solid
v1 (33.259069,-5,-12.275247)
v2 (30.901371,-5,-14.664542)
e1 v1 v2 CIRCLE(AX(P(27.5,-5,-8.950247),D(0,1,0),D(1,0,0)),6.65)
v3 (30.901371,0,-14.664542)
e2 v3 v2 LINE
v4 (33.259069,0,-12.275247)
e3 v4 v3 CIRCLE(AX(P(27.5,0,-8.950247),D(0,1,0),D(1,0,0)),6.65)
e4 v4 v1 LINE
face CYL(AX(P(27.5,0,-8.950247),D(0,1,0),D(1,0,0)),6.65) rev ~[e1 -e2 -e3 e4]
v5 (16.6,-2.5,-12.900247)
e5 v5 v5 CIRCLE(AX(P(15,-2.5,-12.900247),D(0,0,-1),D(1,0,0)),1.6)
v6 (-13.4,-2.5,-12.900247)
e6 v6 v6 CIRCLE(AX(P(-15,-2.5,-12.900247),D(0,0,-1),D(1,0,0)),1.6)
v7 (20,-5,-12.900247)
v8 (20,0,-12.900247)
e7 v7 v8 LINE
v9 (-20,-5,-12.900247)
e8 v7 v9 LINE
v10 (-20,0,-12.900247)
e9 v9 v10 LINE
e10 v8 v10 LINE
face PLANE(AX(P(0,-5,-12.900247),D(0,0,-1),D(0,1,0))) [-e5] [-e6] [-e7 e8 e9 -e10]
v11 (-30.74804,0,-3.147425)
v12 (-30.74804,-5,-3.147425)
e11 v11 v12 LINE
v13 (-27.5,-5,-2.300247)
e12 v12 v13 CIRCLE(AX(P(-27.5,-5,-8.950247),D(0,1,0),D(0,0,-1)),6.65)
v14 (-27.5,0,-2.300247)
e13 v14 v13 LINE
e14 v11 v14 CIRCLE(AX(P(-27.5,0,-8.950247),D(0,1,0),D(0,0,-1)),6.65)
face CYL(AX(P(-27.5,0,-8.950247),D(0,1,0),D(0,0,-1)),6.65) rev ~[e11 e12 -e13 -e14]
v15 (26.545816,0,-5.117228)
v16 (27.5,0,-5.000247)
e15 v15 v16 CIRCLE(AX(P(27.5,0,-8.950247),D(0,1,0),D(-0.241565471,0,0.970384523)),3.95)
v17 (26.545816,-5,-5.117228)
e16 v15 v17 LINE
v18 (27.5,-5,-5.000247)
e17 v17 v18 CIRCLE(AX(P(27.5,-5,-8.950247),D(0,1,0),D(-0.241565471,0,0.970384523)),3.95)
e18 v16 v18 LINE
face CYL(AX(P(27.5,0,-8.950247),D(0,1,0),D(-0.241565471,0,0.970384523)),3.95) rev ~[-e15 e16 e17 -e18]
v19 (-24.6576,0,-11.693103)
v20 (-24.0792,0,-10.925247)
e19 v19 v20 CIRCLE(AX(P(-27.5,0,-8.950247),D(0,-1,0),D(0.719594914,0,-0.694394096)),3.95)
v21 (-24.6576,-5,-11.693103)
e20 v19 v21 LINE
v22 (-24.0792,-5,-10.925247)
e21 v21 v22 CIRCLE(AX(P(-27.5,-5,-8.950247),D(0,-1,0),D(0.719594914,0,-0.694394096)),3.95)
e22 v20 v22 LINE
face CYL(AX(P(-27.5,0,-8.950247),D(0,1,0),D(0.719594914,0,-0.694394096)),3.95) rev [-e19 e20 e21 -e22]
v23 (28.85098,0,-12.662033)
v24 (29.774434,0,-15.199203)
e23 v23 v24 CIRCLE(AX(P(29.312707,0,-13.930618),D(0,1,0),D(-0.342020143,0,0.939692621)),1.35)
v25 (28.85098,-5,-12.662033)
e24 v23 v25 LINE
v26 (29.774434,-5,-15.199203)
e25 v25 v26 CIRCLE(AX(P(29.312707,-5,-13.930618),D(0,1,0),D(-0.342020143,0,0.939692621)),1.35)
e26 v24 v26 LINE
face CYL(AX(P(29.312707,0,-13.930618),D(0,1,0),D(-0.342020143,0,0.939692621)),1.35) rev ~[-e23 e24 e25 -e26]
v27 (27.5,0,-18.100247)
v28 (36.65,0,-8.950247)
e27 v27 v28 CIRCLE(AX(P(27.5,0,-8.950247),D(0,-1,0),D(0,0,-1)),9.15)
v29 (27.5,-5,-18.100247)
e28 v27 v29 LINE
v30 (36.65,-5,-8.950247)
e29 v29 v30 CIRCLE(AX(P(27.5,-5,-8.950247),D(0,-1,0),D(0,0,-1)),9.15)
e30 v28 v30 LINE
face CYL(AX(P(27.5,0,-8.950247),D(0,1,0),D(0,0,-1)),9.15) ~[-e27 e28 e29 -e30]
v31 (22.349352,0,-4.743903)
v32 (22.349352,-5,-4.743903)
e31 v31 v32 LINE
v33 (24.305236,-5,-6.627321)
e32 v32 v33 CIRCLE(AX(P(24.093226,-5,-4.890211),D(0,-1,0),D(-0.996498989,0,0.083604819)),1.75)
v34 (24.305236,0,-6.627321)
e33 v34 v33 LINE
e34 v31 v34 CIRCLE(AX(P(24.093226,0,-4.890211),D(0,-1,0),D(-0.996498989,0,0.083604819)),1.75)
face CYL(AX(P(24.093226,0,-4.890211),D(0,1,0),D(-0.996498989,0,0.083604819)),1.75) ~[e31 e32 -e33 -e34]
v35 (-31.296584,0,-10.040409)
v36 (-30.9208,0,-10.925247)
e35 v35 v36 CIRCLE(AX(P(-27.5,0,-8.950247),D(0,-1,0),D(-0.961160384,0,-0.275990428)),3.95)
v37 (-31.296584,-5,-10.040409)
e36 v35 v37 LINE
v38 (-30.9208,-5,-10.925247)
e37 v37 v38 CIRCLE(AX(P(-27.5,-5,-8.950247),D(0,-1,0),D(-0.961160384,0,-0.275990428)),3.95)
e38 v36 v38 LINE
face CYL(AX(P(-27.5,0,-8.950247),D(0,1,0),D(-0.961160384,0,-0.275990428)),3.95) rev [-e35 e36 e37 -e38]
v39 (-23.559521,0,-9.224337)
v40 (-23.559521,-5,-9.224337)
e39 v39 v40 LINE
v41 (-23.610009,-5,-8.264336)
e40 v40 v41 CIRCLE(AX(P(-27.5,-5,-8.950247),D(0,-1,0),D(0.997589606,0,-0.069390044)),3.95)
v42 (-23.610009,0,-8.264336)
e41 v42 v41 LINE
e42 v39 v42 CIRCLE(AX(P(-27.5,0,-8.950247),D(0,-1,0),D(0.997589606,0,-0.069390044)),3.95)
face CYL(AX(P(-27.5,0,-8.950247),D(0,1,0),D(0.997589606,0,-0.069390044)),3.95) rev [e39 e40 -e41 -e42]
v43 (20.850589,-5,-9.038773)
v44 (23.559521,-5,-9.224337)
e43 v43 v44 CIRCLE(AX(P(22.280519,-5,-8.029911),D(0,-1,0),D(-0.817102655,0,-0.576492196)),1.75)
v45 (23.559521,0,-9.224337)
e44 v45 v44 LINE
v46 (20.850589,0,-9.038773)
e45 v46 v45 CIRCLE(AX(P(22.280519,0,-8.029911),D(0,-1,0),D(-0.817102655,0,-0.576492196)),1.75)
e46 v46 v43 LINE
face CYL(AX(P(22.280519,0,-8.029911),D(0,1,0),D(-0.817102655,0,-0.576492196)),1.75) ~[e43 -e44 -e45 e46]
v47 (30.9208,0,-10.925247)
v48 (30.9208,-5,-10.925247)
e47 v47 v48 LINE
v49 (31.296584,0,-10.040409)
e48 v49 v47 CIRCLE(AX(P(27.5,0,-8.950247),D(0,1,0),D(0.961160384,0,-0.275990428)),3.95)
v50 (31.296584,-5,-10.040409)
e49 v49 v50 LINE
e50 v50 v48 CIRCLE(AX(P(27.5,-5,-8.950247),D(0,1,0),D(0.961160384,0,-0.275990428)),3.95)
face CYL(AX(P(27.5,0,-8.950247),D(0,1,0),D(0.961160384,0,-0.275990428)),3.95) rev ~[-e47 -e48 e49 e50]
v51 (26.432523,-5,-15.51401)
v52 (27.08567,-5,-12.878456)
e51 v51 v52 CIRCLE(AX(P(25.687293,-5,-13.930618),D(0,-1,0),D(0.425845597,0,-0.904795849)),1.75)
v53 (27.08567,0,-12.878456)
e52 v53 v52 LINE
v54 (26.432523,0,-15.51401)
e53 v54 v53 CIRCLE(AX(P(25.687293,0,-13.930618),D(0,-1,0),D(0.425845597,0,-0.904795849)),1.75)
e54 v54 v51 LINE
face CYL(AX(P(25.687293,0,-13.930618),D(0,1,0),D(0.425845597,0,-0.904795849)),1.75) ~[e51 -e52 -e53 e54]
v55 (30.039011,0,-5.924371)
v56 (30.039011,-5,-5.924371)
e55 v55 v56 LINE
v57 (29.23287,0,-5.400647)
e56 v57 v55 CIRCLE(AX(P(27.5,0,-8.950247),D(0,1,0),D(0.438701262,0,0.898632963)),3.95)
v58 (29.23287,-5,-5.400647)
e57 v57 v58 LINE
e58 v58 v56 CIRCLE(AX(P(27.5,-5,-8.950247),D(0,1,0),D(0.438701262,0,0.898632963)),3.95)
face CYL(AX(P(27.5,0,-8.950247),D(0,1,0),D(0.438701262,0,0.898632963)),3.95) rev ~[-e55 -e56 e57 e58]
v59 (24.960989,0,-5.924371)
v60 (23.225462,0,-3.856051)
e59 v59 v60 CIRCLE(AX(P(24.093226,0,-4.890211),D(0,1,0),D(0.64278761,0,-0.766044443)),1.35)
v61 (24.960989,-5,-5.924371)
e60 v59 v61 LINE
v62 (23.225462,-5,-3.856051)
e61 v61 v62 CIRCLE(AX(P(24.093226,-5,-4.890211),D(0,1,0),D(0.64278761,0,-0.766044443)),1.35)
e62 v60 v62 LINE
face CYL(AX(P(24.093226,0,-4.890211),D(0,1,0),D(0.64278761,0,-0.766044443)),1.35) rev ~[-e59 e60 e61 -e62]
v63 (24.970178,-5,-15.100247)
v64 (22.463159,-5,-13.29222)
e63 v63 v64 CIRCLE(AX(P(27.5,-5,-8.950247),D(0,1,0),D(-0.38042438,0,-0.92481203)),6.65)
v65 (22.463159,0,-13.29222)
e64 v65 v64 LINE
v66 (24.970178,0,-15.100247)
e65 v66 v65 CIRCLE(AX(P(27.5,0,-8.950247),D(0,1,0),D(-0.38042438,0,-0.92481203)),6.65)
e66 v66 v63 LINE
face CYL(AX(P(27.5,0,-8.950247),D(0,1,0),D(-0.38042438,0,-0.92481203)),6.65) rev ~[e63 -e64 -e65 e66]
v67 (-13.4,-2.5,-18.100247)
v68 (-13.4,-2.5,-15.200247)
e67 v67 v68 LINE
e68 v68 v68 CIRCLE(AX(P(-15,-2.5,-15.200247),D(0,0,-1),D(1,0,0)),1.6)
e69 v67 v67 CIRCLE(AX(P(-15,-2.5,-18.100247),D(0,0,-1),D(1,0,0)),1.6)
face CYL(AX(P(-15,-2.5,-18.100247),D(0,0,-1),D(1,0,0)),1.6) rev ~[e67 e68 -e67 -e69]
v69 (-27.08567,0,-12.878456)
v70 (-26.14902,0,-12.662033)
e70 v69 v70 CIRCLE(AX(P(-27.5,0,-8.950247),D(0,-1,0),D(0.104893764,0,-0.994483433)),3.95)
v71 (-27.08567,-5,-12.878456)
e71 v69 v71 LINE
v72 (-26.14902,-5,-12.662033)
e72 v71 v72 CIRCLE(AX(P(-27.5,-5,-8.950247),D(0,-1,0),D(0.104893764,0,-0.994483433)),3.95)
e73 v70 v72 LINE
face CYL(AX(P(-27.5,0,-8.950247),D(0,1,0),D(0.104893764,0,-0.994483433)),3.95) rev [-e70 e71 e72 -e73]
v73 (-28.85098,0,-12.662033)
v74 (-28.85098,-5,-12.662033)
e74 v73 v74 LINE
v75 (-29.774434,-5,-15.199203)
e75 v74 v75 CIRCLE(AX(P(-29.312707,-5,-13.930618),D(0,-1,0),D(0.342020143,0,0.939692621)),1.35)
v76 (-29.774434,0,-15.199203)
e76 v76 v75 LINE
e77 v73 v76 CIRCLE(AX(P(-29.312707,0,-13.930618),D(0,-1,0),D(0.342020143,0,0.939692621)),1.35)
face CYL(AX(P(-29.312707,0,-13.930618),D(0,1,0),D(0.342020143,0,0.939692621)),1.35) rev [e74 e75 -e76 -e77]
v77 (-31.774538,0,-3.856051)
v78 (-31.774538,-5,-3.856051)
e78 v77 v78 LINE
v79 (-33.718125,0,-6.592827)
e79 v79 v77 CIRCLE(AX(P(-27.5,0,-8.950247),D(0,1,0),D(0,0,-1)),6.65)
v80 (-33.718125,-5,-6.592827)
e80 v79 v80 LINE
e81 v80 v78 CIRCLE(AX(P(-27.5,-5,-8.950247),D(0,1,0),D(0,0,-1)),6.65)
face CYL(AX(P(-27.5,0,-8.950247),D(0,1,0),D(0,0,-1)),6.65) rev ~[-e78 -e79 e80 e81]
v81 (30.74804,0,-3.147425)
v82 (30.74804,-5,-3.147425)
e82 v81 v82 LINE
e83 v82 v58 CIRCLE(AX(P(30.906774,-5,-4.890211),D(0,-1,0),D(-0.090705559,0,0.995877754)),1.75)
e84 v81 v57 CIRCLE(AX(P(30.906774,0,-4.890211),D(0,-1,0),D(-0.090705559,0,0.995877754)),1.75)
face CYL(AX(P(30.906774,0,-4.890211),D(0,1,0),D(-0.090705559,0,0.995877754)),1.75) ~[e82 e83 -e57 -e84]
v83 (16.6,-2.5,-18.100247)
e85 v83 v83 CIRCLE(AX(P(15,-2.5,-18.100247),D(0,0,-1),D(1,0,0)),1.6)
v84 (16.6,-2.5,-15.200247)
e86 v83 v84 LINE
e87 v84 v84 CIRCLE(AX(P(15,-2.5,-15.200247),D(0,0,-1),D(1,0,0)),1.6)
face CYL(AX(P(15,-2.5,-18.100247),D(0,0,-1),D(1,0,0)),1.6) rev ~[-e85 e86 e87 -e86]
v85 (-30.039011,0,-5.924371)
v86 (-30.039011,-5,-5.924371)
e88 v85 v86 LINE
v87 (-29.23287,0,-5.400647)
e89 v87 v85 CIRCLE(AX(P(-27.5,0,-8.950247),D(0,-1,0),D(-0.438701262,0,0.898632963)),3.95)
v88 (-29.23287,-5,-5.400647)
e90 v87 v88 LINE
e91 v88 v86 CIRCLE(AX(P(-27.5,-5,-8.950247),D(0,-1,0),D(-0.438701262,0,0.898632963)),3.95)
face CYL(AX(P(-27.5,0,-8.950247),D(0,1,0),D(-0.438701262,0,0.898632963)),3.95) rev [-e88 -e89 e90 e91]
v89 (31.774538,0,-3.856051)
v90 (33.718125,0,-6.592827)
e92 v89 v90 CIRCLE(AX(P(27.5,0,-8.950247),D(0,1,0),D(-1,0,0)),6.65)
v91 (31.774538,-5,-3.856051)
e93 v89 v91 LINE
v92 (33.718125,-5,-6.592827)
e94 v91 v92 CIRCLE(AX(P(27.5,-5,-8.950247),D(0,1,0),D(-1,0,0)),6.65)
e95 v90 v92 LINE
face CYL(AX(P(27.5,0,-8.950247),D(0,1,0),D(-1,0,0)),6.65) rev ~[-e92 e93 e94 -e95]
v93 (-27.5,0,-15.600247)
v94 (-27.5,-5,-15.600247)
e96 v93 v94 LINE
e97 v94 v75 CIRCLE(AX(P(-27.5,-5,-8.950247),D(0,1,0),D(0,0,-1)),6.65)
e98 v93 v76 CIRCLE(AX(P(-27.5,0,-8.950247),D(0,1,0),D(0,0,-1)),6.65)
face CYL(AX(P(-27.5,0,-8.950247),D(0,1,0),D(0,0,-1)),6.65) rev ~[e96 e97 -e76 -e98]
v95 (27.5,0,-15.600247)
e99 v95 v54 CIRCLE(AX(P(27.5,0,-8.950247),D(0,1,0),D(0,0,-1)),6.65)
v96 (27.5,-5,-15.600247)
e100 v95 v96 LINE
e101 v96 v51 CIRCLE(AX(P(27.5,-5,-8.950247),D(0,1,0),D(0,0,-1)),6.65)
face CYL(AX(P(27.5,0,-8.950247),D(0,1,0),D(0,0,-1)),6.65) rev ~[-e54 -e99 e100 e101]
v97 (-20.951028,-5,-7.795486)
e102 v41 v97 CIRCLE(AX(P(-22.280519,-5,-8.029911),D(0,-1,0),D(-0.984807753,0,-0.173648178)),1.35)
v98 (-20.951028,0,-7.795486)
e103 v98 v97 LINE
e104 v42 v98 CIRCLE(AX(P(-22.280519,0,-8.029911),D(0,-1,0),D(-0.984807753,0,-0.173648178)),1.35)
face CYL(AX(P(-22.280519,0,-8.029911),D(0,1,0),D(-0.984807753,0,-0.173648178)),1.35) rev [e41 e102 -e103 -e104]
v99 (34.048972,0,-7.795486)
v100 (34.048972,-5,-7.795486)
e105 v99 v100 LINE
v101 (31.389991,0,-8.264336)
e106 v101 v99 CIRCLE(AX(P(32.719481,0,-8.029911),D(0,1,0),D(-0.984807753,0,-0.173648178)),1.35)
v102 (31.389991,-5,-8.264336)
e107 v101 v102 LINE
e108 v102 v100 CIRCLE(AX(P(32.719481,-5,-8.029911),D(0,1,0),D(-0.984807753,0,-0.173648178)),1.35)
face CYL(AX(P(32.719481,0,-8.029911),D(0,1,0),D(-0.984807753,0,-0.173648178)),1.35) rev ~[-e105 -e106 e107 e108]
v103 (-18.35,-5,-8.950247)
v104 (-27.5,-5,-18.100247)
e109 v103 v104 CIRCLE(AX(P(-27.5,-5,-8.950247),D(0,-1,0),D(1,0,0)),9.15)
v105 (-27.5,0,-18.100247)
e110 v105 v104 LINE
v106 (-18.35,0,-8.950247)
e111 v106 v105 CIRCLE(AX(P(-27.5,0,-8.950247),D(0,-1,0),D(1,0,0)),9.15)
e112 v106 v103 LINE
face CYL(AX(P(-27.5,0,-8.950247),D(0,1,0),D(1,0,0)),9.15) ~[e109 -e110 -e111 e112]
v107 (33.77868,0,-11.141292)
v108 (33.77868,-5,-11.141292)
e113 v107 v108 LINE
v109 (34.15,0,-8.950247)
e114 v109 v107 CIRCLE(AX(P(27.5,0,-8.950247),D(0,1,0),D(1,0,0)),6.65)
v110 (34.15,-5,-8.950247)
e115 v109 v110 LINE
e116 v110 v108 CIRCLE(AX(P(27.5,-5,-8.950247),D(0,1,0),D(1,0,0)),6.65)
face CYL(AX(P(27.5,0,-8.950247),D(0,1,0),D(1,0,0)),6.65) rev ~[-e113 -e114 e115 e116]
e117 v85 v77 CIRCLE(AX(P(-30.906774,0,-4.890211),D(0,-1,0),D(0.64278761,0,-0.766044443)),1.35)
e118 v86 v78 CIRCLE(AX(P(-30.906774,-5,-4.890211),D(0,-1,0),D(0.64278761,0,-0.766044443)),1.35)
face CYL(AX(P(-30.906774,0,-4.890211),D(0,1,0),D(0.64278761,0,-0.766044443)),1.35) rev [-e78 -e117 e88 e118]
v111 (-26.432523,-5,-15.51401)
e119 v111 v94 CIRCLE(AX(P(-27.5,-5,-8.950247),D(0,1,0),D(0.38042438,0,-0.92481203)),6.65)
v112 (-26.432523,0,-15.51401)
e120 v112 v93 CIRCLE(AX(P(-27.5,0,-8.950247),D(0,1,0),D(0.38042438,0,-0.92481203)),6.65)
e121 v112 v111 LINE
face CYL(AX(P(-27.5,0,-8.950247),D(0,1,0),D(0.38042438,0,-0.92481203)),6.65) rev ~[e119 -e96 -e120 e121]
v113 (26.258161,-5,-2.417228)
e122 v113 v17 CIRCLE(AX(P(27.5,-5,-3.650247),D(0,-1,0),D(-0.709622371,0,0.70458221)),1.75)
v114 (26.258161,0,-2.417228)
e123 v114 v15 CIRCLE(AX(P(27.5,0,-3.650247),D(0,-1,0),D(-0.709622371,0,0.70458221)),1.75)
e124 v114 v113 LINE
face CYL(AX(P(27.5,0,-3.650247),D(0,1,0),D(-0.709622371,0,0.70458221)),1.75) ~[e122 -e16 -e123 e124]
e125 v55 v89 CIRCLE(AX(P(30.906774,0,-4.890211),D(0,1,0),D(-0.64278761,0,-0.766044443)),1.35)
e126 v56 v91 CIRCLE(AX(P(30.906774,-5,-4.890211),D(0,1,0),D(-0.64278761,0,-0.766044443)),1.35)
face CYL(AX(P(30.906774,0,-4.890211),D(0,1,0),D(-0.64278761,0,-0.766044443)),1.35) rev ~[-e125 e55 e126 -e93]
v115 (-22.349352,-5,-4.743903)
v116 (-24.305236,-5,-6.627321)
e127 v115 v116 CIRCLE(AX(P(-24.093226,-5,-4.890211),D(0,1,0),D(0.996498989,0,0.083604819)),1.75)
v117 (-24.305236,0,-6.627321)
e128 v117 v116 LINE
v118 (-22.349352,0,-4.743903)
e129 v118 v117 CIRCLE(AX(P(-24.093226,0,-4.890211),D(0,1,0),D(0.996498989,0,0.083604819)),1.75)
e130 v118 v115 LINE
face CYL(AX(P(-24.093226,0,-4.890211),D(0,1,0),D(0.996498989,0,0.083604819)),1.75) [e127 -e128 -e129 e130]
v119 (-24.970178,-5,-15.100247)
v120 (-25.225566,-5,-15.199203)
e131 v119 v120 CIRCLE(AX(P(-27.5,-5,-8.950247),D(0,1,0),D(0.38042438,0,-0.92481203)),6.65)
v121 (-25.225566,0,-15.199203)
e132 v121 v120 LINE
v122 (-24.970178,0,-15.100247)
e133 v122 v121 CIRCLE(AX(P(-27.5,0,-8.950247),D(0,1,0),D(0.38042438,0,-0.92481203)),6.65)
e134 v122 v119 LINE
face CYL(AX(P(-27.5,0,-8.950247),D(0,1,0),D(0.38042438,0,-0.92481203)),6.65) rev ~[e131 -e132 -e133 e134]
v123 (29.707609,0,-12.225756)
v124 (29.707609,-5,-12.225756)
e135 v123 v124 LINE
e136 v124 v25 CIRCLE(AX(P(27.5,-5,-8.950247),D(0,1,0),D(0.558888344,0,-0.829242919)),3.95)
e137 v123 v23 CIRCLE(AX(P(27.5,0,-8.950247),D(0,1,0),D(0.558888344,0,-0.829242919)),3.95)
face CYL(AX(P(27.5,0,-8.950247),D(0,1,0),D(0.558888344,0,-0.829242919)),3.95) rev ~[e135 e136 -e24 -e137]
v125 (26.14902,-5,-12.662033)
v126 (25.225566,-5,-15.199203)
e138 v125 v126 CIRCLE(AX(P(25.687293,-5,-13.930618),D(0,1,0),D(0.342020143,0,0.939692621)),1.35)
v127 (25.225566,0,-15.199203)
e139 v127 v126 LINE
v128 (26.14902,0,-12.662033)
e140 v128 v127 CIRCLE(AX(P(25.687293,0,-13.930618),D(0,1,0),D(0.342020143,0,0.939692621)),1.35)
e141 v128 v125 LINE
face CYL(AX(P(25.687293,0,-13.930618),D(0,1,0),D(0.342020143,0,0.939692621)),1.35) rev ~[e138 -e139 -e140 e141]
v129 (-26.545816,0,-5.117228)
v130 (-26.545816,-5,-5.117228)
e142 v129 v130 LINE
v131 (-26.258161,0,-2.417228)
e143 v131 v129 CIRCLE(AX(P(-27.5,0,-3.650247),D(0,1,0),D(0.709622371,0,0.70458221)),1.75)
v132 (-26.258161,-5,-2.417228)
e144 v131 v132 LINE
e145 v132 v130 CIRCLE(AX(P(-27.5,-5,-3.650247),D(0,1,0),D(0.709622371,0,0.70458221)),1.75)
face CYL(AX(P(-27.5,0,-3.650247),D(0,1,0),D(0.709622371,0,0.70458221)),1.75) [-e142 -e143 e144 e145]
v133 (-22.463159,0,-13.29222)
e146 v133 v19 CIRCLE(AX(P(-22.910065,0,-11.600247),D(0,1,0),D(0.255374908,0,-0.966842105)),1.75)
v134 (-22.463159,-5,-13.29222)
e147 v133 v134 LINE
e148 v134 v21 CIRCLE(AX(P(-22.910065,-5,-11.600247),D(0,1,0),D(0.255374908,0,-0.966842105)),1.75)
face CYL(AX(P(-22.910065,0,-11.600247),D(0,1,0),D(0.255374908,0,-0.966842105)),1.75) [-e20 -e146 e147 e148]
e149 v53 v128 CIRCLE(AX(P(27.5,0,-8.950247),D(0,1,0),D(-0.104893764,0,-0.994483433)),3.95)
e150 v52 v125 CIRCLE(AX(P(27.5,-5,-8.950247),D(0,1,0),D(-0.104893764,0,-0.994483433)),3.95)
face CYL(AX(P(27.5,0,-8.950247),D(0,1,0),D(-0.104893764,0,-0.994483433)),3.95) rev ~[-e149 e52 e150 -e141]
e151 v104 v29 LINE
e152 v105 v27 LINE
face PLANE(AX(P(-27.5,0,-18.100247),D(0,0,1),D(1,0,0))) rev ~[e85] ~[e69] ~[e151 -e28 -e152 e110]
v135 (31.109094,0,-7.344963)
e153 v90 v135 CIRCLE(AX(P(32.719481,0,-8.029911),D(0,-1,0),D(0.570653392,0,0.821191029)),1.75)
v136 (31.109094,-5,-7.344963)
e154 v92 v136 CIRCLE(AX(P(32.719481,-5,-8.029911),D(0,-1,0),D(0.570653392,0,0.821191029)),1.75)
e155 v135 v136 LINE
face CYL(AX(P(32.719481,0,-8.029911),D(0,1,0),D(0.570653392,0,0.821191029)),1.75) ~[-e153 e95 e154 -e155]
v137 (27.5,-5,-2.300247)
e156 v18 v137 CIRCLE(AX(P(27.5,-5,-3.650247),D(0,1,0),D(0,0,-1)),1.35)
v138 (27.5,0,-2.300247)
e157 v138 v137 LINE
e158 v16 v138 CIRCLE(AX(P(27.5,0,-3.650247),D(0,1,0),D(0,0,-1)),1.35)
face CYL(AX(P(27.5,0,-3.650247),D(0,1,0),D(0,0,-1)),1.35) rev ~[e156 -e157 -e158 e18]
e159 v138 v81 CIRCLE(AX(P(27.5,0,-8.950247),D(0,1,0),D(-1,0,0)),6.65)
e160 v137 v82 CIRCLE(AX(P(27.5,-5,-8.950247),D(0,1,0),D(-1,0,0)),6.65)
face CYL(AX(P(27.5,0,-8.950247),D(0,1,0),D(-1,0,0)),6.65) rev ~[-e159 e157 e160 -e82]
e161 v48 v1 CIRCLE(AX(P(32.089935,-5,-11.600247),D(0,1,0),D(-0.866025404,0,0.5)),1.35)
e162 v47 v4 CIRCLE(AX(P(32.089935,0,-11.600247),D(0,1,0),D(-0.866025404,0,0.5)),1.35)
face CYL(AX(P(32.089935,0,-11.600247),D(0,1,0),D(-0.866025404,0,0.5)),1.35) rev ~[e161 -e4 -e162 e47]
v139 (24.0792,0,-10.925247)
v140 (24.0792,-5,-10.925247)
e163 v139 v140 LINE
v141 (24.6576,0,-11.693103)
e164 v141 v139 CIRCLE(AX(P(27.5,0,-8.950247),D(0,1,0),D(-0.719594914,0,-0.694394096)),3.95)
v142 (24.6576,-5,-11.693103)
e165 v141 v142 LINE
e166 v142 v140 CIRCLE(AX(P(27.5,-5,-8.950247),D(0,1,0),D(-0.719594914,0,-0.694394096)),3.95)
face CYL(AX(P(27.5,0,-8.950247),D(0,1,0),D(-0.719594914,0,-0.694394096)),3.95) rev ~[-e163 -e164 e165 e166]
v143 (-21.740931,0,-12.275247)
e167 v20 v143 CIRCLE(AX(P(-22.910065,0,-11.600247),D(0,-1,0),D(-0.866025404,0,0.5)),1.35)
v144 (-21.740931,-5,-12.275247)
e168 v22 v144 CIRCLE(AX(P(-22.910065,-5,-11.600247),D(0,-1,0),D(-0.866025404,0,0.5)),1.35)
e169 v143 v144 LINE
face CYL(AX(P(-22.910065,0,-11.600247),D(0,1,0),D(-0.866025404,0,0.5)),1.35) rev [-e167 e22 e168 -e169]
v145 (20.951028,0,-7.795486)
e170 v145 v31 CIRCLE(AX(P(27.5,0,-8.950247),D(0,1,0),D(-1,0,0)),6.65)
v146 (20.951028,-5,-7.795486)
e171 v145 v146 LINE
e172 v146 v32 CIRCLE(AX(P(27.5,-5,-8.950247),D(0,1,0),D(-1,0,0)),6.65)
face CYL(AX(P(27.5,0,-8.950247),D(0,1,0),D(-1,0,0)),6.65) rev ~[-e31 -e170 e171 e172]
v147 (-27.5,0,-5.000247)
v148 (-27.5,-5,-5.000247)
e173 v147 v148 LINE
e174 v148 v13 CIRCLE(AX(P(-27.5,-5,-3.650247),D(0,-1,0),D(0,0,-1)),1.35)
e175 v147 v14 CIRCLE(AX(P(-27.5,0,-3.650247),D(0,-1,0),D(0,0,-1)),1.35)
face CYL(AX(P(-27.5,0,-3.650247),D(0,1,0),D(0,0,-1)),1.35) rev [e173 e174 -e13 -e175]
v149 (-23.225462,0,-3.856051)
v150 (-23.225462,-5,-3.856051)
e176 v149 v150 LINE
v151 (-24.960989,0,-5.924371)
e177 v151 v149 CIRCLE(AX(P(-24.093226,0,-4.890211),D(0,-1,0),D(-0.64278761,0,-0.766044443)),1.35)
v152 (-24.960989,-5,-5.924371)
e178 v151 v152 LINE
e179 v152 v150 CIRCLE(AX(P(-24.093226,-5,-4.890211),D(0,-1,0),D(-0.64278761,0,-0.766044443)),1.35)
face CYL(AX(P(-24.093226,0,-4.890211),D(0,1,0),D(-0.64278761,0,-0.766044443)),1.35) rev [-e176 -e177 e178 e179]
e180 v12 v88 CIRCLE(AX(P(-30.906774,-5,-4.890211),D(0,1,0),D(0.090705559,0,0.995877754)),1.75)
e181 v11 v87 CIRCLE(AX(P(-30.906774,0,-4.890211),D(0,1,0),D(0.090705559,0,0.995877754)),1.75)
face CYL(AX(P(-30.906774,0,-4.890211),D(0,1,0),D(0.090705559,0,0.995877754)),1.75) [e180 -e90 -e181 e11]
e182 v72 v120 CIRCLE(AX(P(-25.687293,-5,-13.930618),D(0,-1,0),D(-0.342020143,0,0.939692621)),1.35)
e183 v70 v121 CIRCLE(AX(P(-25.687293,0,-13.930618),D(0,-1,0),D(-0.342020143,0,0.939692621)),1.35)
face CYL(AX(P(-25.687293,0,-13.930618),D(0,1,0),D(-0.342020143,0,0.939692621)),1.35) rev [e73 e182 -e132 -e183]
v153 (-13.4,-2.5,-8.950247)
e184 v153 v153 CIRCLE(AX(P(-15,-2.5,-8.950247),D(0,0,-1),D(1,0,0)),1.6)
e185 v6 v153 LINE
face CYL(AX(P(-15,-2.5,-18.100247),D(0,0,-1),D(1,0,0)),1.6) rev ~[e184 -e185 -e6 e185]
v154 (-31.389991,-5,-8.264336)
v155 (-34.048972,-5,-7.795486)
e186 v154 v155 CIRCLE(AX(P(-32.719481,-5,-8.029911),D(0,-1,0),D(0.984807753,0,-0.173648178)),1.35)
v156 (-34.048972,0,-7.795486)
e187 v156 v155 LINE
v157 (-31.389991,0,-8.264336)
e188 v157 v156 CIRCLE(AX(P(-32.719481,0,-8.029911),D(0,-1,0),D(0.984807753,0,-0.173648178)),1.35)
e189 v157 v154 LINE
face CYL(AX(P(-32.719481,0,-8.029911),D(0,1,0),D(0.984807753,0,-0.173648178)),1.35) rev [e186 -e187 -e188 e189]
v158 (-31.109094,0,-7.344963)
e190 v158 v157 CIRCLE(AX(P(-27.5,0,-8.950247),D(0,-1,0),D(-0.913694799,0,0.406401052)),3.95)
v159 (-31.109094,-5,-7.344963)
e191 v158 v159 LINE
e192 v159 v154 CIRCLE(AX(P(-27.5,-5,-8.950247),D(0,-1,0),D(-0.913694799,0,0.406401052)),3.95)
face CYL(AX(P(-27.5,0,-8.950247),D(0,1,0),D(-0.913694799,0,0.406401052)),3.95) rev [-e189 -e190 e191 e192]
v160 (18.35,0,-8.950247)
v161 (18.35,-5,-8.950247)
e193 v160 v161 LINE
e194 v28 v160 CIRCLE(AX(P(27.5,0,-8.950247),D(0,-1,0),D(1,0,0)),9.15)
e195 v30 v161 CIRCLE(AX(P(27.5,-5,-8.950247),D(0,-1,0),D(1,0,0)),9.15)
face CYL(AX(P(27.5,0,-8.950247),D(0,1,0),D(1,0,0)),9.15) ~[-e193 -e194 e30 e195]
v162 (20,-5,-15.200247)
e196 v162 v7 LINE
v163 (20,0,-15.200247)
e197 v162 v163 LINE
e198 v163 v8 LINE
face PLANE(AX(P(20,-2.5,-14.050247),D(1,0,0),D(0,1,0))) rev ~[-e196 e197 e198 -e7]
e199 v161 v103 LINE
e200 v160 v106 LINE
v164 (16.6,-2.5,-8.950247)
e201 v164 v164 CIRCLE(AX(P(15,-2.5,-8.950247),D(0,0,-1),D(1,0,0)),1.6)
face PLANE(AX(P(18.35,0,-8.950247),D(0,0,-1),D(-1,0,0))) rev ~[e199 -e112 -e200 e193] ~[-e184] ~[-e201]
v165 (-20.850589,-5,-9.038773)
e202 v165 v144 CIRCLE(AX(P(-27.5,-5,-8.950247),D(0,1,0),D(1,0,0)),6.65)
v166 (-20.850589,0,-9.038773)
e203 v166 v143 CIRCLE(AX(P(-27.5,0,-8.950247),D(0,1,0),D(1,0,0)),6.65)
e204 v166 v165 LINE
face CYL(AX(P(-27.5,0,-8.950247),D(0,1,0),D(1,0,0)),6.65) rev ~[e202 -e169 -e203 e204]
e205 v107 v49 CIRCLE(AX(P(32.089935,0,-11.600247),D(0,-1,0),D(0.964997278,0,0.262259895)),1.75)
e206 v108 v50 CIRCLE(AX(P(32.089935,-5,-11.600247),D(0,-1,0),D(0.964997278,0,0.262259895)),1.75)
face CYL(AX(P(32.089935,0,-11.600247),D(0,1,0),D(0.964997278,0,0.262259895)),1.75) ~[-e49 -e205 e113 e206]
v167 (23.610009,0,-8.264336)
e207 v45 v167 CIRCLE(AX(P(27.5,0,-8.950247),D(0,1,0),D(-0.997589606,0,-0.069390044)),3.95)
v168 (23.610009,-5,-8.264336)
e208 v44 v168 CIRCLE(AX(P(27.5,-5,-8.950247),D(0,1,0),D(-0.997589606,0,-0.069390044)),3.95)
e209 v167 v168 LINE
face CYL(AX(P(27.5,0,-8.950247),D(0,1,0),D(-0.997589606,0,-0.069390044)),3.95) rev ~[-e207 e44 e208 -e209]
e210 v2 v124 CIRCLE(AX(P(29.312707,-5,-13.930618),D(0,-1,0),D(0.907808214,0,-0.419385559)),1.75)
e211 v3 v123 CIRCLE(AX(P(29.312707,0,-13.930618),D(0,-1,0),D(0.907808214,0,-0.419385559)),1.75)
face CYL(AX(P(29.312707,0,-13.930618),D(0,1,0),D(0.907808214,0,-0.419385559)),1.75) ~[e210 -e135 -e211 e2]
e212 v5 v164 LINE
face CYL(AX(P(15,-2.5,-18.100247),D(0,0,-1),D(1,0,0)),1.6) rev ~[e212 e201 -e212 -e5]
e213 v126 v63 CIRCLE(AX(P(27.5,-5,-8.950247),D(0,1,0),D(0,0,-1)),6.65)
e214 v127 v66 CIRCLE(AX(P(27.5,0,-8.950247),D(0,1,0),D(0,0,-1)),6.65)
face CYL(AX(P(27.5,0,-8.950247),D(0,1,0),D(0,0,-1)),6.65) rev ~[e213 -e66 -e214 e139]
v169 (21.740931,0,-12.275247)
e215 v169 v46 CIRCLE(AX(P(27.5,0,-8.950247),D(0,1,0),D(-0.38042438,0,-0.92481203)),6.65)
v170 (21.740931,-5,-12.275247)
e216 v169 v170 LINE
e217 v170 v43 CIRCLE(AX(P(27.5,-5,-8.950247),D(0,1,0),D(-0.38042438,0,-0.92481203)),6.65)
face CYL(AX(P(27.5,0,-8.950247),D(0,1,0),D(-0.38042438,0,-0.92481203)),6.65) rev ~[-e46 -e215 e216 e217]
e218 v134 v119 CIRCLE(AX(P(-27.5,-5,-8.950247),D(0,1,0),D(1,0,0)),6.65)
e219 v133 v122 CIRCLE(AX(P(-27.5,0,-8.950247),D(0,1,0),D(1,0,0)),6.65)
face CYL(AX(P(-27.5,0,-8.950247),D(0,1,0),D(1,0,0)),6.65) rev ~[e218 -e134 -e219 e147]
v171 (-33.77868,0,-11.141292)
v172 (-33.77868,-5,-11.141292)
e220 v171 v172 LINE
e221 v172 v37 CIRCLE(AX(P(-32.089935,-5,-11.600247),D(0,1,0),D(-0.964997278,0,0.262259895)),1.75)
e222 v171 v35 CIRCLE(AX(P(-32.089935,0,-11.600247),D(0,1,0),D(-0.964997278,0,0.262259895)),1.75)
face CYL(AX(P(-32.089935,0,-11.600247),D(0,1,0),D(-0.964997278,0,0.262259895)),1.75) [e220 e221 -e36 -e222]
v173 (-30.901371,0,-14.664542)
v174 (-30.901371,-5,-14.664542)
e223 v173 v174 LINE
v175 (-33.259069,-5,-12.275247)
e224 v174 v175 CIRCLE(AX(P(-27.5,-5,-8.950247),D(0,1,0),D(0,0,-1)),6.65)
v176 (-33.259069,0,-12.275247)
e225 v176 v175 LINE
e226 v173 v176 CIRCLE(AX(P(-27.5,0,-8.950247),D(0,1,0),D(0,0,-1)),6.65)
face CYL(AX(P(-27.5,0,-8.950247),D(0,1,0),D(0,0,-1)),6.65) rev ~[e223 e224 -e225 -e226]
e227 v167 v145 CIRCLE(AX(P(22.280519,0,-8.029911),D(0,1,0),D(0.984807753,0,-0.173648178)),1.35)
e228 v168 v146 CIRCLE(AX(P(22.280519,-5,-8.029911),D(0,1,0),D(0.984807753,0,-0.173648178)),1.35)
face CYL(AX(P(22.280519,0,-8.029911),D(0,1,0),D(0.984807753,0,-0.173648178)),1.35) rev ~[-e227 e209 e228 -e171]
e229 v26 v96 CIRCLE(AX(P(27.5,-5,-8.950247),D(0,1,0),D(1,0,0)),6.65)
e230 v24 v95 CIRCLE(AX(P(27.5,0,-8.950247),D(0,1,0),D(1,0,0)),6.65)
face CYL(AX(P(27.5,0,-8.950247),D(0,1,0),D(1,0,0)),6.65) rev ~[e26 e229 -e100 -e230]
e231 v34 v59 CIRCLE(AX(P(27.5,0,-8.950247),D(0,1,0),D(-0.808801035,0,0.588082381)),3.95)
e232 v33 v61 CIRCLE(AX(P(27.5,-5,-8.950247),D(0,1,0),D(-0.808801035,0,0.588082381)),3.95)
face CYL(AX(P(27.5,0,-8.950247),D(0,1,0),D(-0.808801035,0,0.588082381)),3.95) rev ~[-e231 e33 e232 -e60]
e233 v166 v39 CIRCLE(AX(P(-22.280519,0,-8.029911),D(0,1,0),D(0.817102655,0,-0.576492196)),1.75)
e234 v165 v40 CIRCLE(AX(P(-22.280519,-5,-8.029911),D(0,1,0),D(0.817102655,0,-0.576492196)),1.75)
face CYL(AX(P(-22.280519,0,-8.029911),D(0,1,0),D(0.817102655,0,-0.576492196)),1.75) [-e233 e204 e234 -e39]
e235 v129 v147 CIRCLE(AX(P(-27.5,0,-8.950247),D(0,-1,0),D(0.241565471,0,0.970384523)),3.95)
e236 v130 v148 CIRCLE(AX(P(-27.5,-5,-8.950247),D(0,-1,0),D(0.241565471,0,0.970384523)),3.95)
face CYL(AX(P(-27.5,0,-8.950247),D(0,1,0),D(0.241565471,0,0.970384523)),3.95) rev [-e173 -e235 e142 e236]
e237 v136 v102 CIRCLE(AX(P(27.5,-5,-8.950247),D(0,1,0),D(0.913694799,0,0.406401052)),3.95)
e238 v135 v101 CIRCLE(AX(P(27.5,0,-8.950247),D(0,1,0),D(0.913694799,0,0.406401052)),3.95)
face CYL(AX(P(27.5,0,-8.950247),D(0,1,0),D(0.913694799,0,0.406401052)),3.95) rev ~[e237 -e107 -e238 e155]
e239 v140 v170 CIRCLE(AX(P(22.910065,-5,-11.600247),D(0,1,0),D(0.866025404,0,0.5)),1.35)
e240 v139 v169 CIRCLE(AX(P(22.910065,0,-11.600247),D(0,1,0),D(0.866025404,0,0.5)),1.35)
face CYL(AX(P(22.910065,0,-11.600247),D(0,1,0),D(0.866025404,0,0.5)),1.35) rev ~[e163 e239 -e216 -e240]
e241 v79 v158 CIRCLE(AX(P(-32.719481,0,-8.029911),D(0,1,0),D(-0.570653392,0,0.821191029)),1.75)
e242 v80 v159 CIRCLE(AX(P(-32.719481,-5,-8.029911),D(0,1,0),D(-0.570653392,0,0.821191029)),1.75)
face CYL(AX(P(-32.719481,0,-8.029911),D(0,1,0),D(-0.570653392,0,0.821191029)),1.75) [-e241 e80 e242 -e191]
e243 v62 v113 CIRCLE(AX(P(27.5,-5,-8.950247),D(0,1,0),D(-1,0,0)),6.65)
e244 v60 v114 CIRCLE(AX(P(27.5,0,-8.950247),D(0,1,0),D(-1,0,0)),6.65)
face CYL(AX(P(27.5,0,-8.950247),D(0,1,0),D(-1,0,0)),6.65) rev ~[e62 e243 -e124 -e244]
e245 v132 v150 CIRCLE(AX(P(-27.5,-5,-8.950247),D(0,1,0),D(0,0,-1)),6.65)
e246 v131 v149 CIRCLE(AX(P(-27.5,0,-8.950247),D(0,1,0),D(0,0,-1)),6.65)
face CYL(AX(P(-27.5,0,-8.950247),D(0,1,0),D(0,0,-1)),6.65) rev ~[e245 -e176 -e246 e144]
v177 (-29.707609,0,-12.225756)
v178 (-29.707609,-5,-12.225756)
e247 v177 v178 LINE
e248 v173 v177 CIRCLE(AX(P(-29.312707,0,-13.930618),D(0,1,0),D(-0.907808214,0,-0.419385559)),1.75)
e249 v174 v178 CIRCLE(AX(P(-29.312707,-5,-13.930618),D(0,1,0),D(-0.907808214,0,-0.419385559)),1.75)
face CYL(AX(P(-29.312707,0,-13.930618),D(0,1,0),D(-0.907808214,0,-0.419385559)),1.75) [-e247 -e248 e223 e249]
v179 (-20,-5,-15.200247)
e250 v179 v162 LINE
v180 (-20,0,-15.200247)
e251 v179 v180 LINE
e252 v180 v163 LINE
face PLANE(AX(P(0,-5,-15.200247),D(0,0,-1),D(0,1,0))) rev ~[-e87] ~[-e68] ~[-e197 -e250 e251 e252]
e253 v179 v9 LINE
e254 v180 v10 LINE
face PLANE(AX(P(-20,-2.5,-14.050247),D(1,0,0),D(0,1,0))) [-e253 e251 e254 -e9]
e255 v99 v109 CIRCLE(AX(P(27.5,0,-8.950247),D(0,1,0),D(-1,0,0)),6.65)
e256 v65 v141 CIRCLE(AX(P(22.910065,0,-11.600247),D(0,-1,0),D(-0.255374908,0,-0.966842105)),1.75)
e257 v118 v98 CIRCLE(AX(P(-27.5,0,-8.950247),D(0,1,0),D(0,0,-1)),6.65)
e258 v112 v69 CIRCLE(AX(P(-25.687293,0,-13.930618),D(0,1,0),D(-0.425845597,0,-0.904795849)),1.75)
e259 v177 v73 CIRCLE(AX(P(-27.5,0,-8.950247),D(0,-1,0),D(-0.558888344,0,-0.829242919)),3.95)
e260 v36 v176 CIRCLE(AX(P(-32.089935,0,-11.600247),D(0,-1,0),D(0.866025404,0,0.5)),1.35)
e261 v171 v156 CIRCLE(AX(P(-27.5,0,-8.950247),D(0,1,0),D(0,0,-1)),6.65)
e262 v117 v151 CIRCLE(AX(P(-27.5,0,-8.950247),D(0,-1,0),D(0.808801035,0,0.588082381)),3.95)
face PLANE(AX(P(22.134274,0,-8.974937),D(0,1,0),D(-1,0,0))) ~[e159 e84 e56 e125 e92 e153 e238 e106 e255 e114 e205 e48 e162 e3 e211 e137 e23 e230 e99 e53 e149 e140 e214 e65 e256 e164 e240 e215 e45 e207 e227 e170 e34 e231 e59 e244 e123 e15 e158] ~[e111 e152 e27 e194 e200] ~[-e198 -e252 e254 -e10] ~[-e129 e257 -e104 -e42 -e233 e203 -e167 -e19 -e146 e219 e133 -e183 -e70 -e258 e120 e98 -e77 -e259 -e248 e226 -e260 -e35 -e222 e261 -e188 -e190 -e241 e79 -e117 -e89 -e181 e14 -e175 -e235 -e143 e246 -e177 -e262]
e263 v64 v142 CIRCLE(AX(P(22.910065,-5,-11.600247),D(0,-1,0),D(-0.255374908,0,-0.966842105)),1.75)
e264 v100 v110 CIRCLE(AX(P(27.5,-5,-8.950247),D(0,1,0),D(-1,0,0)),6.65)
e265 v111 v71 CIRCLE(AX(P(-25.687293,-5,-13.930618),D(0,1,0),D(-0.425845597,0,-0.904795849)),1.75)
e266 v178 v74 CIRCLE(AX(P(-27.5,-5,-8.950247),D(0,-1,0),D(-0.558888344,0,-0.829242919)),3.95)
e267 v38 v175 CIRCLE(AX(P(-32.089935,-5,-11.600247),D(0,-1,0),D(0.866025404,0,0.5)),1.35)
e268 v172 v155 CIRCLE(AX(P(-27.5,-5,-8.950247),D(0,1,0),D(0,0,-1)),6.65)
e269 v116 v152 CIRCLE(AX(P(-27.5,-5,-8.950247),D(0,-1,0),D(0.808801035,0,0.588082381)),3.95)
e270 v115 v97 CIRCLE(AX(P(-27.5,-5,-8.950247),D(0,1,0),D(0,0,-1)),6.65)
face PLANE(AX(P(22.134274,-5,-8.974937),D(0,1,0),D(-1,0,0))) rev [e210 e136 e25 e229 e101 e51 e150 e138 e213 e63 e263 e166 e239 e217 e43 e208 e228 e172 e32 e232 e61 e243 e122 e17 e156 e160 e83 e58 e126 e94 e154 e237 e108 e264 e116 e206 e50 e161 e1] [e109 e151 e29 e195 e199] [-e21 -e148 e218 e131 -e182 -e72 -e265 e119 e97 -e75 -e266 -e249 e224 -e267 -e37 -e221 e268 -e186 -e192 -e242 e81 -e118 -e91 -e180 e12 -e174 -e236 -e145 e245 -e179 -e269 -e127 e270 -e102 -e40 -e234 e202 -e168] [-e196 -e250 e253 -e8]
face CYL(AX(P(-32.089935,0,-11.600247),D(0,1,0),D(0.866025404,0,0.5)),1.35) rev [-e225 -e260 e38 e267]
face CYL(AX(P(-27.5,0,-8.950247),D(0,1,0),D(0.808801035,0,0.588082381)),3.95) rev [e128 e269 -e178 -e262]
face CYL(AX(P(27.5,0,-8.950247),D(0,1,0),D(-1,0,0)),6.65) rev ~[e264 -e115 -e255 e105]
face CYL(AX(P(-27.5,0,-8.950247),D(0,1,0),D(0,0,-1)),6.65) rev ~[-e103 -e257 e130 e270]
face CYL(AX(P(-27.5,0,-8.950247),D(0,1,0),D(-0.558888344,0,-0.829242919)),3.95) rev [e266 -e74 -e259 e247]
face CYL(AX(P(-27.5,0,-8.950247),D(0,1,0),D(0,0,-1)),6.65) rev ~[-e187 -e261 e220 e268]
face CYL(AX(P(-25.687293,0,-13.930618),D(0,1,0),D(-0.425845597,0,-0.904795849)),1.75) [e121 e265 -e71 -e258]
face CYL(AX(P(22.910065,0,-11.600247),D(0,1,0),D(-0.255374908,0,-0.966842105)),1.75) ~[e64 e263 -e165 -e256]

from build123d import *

# Parameters (mm, degrees)
F1_DEPTH = 5
F3_DEPTH = 5
F4_W     = 5
F4_H     = 2.3
F5_DEPTH = 20
F6_R     = 1.6
F7_DEPTH = 18.301


# Not quite as in the source:
# - a pattern or mirror of a feature is missing from the dataset's text; its kind, count and spacing are read off the source's solid


with BuildPart() as f1:
    # F0 (on Front) → F1 (new body)
    with BuildSketch(Plane.XZ):
        with BuildLine():
            ThreePointArc((-27.5, -15.6002467841), (-32.2022600949, -4.2479866892), (-20.85, -8.9502467841))
            Line((-20.85, -8.9502467841), (-18.35, -8.9502467841))
            ThreePointArc((-18.35, -8.9502467841), (-33.9700270479, -2.4802197362), (-27.5, -18.1002467841))
            Line((-27.5, -18.1002467841), (-27.5, -15.6002467841))
        make_face()
        with BuildLine():
            Line((-18.35, -8.9502467841), (-20.85, -8.9502467841))
            Line((-20.85, -8.9502467841), (-20.85, -15.1002467841))
            Line((-20.85, -15.1002467841), (-20.7250461256, -15.1002467841))
            ThreePointArc((-20.7250461256, -15.1002467841), (-18.9643884826, -12.2465835425), (-18.35, -8.9502467841))
        make_face()
        with BuildLine():
            ThreePointArc((-24.9701778719, -15.1002467841), (-26.2106203042, -15.4740493562), (-27.5, -15.6002467841))
            Line((-27.5, -15.6002467841), (-27.5, -18.1002467841))
            ThreePointArc((-27.5, -18.1002467841), (-23.7952732894, -17.3166976445), (-20.7250461256, -15.1002467841))
            Line((-20.7250461256, -15.1002467841), (-20.85, -15.1002467841))
            Line((-20.85, -15.1002467841), (-24.9701778719, -15.1002467841))
        make_face()
        with BuildLine():
            Line((18.35, -8.9502467841), (-18.35, -8.9502467841))
            ThreePointArc((-18.35, -8.9502467841), (-18.9643884826, -12.2465835425), (-20.7250461256, -15.1002467841))
            Line((-20.7250461256, -15.1002467841), (20.7250461256, -15.1002467841))
            ThreePointArc((20.7250461256, -15.1002467841), (18.9643884826, -12.2465835425), (18.35, -8.9502467841))
        make_face()
        with BuildLine():
            ThreePointArc((-20.7250461256, -15.1002467841), (-23.7952732894, -17.3166976445), (-27.5, -18.1002467841))
            Line((-27.5, -18.1002467841), (27.5, -18.1002467841))
            ThreePointArc((27.5, -18.1002467841), (23.7952732894, -17.3166976445), (20.7250461256, -15.1002467841))
            Line((20.7250461256, -15.1002467841), (-20.7250461256, -15.1002467841))
        make_face()
        with BuildLine():
            Line((20.85, -8.9502467841), (18.35, -8.9502467841))
            ThreePointArc((18.35, -8.9502467841), (18.9643884826, -12.2465835425), (20.7250461256, -15.1002467841))
            Line((20.7250461256, -15.1002467841), (20.85, -15.1002467841))
            Line((20.85, -15.1002467841), (20.85, -8.9502467841))
        make_face()
        with BuildLine():
            ThreePointArc((36.65, -8.9502467841), (27.5, 0.1997532159), (18.35, -8.9502467841))
            Line((18.35, -8.9502467841), (20.85, -8.9502467841))
            ThreePointArc((20.85, -8.9502467841), (27.5, -2.3002467841), (34.15, -8.9502467841))
            ThreePointArc((34.15, -8.9502467841), (32.2022600949, -13.652506879), (27.5, -15.6002467841))
            Line((27.5, -15.6002467841), (27.5, -18.1002467841))
            ThreePointArc((27.5, -18.1002467841), (33.9700270479, -15.4202738319), (36.65, -8.9502467841))
        make_face()
        with BuildLine():
            ThreePointArc((20.7250461256, -15.1002467841), (23.7952732894, -17.3166976445), (27.5, -18.1002467841))
            Line((27.5, -18.1002467841), (27.5, -15.6002467841))
            ThreePointArc((27.5, -15.6002467841), (26.2106203042, -15.4740493562), (24.9701778719, -15.1002467841))
            Line((24.9701778719, -15.1002467841), (20.85, -15.1002467841))
            Line((20.85, -15.1002467841), (20.7250461256, -15.1002467841))
        make_face()
        with BuildLine():
            Line((-20.85, -15.1002467841), (-20.85, -8.9502467841))
            ThreePointArc((-20.85, -8.9502467841), (-21.9752458357, -12.6515426955), (-24.9701778719, -15.1002467841))
            Line((-24.9701778719, -15.1002467841), (-20.85, -15.1002467841))
        make_face()
        with BuildLine():
            ThreePointArc((24.9701778719, -15.1002467841), (21.9752458357, -12.6515426955), (20.85, -8.9502467841))
            Line((20.85, -8.9502467841), (20.85, -15.1002467841))
            Line((20.85, -15.1002467841), (24.9701778719, -15.1002467841))
        make_face()
    extrude(amount=F1_DEPTH)

    # F2 (on face) → F3 (join, through all)
    with BuildSketch(Plane(origin=(0, 0, 0), x_dir=(-1, 0, 0), z_dir=(0, 1, 0))):
        with BuildLine():
            ThreePointArc((27.5, -5.0002467841), (26.15, -3.6502467841), (27.5, -2.3002467841))
            ThreePointArc((27.5, -2.3002467841), (26.8763316072, -2.3295566587), (26.2581608513, -2.4172279162))
            ThreePointArc((26.2581608513, -2.4172279162), (25.7598479988, -3.8356409932), (26.5458163918, -5.1172279162))
            ThreePointArc((26.5458163918, -5.1172279162), (27.0193361509, -5.0296011403), (27.5, -5.0002467841))
        make_face()
        with BuildLine():
            ThreePointArc((24.9609889417, -5.9243712338), (23.0590656705, -5.7579745086), (23.2254623956, -3.8560512373))
            ThreePointArc((23.2254623956, -3.8560512373), (22.7665447132, -4.2793902194), (22.3493524387, -4.7439028016))
            ThreePointArc((22.3493524387, -4.7439028016), (22.8793609985, -6.1507795846), (24.3052359132, -6.6273213807))
            ThreePointArc((24.3052359132, -6.6273213807), (24.6116476876, -6.2558227419), (24.9609889417, -5.9243712338))
        make_face()
        with BuildLine():
            ThreePointArc((23.6100093756, -8.2643364823), (22.0460938692, -9.359401909), (20.9510284425, -7.7954864026))
            ThreePointArc((20.9510284425, -7.7954864026), (20.8715941544, -8.4147694774), (20.8505892632, -9.0387727847))
            ThreePointArc((20.8505892632, -9.0387727847), (22.1609223396, -9.7758199912), (23.5595210567, -9.2243374579))
            ThreePointArc((23.5595210567, -9.2243374579), (23.5554513717, -8.742795298), (23.6100093756, -8.2643364823))
        make_face()
        with BuildLine():
            ThreePointArc((21.7409310648, -12.2752467841), (22.0781483573, -12.8007045184), (22.4631592713, -13.2922204683))
            ThreePointArc((22.4631592713, -13.2922204683), (23.9406974553, -13.014565519), (24.6576000913, -11.6931034626))
            ThreePointArc((24.6576000913, -11.6931034626), (24.3449531978, -11.32683671), (24.0791996551, -10.9252467841))
            ThreePointArc((24.0791996551, -10.9252467841), (23.5850653599, -12.7693810792), (21.7409310648, -12.2752467841))
        make_face()
        with BuildLine():
            ThreePointArc((25.2255660469, -15.1992027123), (25.8216472009, -15.3849675925), (26.4325230347, -15.5140104094))
            ThreePointArc((26.4325230347, -15.5140104094), (27.3859097889, -14.3515711409), (27.0856696329, -12.878456344))
            ThreePointArc((27.0856696329, -12.878456344), (26.6107364871, -12.7988452828), (26.1490204339, -12.6620326362))
            ThreePointArc((26.1490204339, -12.6620326362), (26.9558782784, -14.3923448677), (25.2255660469, -15.1992027123))
        make_face()
        with BuildLine():
            ThreePointArc((29.7744339531, -15.1992027123), (30.3504659721, -14.9583532863), (30.9013711338, -14.6645424021))
            ThreePointArc((30.9013711338, -14.6645424021), (30.8845062002, -13.1612370672), (29.7076089581, -12.2257563152))
            ThreePointArc((29.7076089581, -12.2257563152), (29.2926160571, -12.4700518457), (28.8509795661, -12.6620326362))
            ThreePointArc((28.8509795661, -12.6620326362), (30.5812917977, -13.4688904808), (29.7744339531, -15.1992027123))
        make_face()
        with BuildLine():
            ThreePointArc((33.2590689352, -12.2752467841), (33.5455200355, -11.7204791751), (33.7786798774, -11.1412919678))
            ThreePointArc((33.7786798774, -11.1412919678), (32.7994545459, -10.0005338401), (31.2965835169, -10.0404089735))
            ThreePointArc((31.2965835169, -10.0404089735), (31.1357106513, -10.494302502), (30.9208003449, -10.9252467841))
            ThreePointArc((30.9208003449, -10.9252467841), (32.7649346401, -10.431112489), (33.2590689352, -12.2752467841))
        make_face()
        with BuildLine():
            ThreePointArc((31.3899906244, -8.2643364823), (32.4850560511, -6.7004209759), (34.0489715575, -7.7954864026))
            ThreePointArc((34.0489715575, -7.7954864026), (33.9118080859, -7.1863825404), (33.7181245266, -6.5928271413))
            ThreePointArc((33.7181245266, -6.5928271413), (32.2347292126, -6.3483896268), (31.1090944539, -7.3449626276))
            ThreePointArc((31.1090944539, -7.3449626276), (31.2776158253, -7.7960723276), (31.3899906244, -8.2643364823))
        make_face()
        with BuildLine():
            ThreePointArc((30.0390110583, -5.9243712338), (29.8726143331, -4.0224479625), (31.7745376044, -3.8560512373))
            ThreePointArc((31.7745376044, -3.8560512373), (31.2779398735, -3.4776175885), (30.748039603, -3.1474251655))
            ThreePointArc((30.748039603, -3.1474251655), (29.4545714601, -3.9136832939), (29.2328699852, -5.4006465792))
            ThreePointArc((29.2328699852, -5.4006465792), (29.6519325712, -5.6378932086), (30.0390110583, -5.9243712338))
        make_face()
    f3 = extrude(amount=-F3_DEPTH)

    # F3_copies: F3 across plane
    add(f3.mirror(Plane(origin=(0, 0, 0), x_dir=(0, 0, 1), z_dir=(1, 0, 0))))

    # F4 (on Right) → F5 (cut, symmetric)
    with BuildSketch(Plane.YZ):
        with Locations((-2.5, -14.0502467841)):
            Rectangle(F4_W, F4_H)
    extrude(amount=F5_DEPTH, both=True, mode=Mode.SUBTRACT)

    # F6 (on face) → F7 (cut, through all)
    with BuildSketch(Plane(origin=(0, 0, -18.1002467841), x_dir=(1, 0, 0), z_dir=(0, 0, -1))):
        with Locations((-15, 2.5)):
            Circle(F6_R)
        with Locations((15, 2.5)):
            Circle(F6_R)
    extrude(amount=-F7_DEPTH, mode=Mode.SUBTRACT)


solid = f1.part
